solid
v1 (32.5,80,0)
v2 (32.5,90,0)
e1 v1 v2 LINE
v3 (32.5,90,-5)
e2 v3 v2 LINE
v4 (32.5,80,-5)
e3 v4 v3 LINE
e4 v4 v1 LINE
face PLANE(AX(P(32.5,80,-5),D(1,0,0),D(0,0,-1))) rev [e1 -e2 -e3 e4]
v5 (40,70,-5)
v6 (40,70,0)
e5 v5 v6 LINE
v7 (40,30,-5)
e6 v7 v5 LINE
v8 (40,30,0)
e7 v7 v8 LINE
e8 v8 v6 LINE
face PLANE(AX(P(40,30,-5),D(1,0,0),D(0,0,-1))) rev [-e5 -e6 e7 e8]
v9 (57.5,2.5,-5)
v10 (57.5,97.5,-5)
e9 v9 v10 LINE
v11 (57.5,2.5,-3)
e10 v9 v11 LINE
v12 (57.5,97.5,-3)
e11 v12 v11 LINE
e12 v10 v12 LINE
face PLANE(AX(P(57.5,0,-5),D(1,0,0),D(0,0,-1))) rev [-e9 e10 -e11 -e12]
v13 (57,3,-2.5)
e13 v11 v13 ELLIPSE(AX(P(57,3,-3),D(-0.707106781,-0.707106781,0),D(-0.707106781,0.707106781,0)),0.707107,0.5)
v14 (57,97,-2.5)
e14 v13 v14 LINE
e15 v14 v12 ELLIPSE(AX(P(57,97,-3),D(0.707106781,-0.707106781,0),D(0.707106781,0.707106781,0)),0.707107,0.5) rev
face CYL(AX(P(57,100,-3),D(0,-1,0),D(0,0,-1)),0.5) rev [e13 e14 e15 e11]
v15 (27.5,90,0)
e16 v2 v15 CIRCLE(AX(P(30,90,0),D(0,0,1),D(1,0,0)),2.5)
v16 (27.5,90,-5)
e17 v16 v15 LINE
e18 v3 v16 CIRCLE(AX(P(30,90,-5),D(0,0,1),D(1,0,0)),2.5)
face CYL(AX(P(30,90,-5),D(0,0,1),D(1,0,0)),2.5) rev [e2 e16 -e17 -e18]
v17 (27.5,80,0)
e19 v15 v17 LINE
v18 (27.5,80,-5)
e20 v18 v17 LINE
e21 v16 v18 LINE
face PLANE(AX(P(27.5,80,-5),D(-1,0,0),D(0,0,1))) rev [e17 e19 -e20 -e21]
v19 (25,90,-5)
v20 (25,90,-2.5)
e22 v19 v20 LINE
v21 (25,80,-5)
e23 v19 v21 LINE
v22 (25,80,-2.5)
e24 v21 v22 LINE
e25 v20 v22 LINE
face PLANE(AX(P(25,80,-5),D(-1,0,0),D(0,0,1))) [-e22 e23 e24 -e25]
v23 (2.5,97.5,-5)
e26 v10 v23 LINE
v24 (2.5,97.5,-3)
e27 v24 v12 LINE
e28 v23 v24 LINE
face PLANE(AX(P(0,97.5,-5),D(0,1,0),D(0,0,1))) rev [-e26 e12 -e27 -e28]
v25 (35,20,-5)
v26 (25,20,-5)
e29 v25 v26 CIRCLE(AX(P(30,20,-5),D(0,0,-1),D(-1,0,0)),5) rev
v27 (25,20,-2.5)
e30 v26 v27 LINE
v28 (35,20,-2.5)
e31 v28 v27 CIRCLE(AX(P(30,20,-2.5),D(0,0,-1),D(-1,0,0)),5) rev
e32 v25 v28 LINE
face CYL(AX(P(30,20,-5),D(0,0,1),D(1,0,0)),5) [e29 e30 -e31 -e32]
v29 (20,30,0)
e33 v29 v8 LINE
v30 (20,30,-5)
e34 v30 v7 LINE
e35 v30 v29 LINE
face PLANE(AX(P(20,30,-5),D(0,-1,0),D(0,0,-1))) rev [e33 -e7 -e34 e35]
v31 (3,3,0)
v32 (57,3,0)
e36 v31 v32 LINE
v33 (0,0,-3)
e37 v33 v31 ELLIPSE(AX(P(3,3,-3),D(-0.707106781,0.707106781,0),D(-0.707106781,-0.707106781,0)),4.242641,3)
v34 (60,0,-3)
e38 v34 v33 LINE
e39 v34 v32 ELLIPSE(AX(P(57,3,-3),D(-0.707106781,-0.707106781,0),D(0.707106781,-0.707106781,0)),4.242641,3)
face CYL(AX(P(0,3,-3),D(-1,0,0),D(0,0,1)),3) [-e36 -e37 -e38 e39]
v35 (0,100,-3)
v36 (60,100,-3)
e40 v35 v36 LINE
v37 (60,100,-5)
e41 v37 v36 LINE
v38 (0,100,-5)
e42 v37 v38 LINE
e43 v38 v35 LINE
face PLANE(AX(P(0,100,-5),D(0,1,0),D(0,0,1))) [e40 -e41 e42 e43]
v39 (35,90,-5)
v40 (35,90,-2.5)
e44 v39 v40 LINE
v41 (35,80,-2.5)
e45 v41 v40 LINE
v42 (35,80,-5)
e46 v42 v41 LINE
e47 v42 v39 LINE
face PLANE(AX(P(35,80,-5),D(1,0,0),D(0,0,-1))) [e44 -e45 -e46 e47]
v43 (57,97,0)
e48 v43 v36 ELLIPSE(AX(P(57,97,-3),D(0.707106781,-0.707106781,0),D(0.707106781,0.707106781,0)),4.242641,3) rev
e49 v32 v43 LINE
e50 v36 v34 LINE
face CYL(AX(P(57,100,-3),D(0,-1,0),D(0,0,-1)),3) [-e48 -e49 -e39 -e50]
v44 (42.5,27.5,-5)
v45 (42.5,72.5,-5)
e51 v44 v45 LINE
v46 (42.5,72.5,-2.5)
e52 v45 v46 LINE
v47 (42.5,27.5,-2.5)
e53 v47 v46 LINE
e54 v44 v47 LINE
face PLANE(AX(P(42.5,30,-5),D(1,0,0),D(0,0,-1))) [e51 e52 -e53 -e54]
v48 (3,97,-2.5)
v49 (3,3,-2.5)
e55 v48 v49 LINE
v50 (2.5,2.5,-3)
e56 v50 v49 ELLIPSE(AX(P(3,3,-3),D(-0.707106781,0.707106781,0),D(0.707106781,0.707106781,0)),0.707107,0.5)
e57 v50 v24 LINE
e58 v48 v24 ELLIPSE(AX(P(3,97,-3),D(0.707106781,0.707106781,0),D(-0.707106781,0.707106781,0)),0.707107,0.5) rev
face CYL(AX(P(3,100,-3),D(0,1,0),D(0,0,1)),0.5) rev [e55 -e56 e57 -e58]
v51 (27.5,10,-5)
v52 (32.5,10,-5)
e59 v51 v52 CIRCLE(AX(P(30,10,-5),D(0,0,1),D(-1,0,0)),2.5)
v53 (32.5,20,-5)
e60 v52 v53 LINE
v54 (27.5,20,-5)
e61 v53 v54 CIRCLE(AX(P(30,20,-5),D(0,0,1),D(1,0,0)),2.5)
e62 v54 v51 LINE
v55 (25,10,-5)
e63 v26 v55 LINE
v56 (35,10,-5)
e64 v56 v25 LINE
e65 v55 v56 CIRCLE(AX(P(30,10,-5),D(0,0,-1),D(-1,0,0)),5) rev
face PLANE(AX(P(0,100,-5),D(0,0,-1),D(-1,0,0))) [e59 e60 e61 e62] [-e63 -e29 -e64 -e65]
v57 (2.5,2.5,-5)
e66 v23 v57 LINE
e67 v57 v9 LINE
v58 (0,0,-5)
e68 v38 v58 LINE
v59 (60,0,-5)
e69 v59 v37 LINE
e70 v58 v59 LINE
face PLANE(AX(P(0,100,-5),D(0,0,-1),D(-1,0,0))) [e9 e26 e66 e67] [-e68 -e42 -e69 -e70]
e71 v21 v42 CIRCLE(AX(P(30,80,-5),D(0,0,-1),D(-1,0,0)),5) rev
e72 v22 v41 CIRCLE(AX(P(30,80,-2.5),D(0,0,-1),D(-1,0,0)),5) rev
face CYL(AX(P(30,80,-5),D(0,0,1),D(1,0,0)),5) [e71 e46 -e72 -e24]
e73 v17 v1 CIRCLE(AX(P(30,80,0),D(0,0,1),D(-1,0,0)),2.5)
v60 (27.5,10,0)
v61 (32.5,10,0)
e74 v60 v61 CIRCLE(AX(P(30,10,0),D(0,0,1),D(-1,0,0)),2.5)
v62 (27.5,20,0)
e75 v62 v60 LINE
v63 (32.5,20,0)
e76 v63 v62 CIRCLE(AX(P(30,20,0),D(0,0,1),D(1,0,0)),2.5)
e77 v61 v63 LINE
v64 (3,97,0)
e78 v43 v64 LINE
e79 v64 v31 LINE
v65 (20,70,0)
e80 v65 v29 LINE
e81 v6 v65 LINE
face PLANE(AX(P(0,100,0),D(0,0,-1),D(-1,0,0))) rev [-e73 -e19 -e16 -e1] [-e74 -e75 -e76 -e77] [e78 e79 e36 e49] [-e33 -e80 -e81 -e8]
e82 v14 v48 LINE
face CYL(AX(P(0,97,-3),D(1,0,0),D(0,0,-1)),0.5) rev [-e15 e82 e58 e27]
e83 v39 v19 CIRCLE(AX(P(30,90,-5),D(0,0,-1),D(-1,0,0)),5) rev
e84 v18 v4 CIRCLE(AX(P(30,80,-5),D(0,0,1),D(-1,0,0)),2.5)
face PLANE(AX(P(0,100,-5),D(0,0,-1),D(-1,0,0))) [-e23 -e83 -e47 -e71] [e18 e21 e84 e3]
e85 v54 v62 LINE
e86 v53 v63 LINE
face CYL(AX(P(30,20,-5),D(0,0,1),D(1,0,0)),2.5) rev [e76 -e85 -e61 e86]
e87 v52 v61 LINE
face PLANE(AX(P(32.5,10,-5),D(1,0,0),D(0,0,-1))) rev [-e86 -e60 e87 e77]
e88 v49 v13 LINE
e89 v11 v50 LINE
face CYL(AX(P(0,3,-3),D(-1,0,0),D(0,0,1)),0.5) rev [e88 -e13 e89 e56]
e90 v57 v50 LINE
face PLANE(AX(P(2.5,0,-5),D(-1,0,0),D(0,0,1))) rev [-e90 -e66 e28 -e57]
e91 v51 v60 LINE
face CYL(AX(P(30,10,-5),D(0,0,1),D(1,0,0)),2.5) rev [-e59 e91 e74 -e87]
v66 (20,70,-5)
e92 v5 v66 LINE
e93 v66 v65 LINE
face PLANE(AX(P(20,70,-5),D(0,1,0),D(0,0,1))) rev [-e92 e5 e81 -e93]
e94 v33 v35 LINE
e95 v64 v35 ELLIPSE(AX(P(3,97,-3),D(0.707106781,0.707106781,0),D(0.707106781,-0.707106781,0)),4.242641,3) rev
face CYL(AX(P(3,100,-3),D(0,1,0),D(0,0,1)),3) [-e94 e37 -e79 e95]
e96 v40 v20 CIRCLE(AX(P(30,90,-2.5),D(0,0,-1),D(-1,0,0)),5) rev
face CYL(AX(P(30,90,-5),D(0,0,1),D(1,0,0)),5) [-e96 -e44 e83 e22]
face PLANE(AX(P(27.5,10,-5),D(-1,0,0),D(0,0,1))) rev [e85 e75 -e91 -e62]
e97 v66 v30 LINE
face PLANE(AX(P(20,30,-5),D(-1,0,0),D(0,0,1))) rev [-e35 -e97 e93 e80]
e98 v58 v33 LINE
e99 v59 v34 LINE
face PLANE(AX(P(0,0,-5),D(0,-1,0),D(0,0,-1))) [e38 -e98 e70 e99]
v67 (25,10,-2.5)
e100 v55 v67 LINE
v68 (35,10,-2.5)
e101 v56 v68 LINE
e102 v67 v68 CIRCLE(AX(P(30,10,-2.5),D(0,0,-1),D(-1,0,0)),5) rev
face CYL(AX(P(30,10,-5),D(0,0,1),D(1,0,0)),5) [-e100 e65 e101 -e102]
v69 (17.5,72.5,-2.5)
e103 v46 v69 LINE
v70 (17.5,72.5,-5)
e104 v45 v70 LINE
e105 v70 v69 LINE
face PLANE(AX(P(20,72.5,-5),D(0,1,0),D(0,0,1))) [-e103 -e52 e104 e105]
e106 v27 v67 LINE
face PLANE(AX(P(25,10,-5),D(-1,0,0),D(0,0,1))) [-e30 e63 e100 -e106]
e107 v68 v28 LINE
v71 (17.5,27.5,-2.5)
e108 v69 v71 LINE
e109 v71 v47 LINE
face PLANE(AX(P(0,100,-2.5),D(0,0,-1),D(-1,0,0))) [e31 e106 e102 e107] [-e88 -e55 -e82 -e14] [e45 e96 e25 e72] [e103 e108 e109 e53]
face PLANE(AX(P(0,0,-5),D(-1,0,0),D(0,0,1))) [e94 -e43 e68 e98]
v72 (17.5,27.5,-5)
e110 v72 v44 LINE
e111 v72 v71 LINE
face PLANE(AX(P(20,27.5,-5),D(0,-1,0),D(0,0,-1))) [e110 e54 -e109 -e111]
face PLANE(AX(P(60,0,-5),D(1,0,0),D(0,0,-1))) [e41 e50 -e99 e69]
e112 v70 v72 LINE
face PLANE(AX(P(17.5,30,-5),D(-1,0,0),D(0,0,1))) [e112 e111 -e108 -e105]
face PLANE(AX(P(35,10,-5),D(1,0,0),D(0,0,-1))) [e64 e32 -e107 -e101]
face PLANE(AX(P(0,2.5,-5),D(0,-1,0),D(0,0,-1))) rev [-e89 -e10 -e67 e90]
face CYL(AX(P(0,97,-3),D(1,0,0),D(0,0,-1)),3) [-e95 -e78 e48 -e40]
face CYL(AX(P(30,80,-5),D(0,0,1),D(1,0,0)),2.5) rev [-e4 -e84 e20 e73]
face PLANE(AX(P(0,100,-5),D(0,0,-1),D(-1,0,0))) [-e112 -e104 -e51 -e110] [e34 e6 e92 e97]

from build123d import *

# Parameters (mm, degrees)
SKETCH1_W          = 60
SKETCH1_H          = 100
SKETCH1_W_2        = 20
SKETCH1_H_2        = 40
EXTRUDE1_DEPTH     = 5
FILLET2_R          = 3
SHELL2_START       = -5
SHELL2_OUTLINE_W   = 55
SHELL2_OUTLINE_H   = 95
SHELL2_OUTLINE_W_2 = 25
SHELL2_OUTLINE_H_2 = 45
SHELL2_DEPTH       = 2.5
SHELL2_START_2     = 2.5
SHELL2_2_DEPTH     = 95
SHELL2_START_3     = 2
SHELL2_3_DEPTH     = 56


with BuildPart() as part:
    # Sketch1 → Extrude1 (new body)
    with BuildSketch(Plane.XY):
        with Locations((30, 50)):
            Rectangle(SKETCH1_W, SKETCH1_H)
        with Locations((30, 50)):
            Rectangle(SKETCH1_W_2, SKETCH1_H_2, mode=Mode.SUBTRACT)
        with BuildLine():
            Line((32.5, 80), (32.5, 90))
            ThreePointArc((32.5, 90), (30, 92.5), (27.5, 90))
            Line((27.5, 90), (27.5, 80))
            ThreePointArc((27.5, 80), (30, 77.5), (32.5, 80))
        make_face(mode=Mode.SUBTRACT)
        with BuildLine():
            Line((27.5, 10), (27.5, 20))
            ThreePointArc((27.5, 20), (30, 22.5), (32.5, 20))
            Line((32.5, 20), (32.5, 10))
            ThreePointArc((32.5, 10), (30, 7.5), (27.5, 10))
        make_face(mode=Mode.SUBTRACT)
    extrude(amount=-EXTRUDE1_DEPTH)

    # Fillet2
    fillet2_edges = [part.edges().sort_by_distance(p)[0] for p in [
        (30, 100, 0),
        (60, 50, 0),
        (30, 0, 0),
        (0, 50, 0),
    ]]
    fillet(fillet2_edges, radius=FILLET2_R)

    # Shell2: read off the stored shape, not the designer's step
    # Shell2 outline → Shell2 (cut)
    with BuildSketch(Plane.XY.offset(SHELL2_START)):
        with Locations((30, 50)):
            Rectangle(SHELL2_OUTLINE_W, SHELL2_OUTLINE_H)
        with BuildLine():
            Line((25, 10), (25, 20))
            ThreePointArc((25, 20), (30, 25), (35, 20))
            Line((35, 20), (35, 10))
            ThreePointArc((35, 10), (30, 5), (25, 10))
        make_face(mode=Mode.SUBTRACT)
        with Locations((30, 50)):
            Rectangle(SHELL2_OUTLINE_W_2, SHELL2_OUTLINE_H_2, mode=Mode.SUBTRACT)
        with BuildLine():
            ThreePointArc((35, 80), (30, 75), (25, 80))
            Line((25, 80), (25, 90))
            ThreePointArc((25, 90), (30, 95), (35, 90))
            Line((35, 90), (35, 80))
        make_face(mode=Mode.SUBTRACT)
    extrude(amount=SHELL2_DEPTH, mode=Mode.SUBTRACT)

    # Shell2 2 outline → Shell2 2 (add)
    with BuildSketch(Plane(origin=(0, 0, 0), x_dir=(1, 0, 0), z_dir=(0, 1, 0)).offset(SHELL2_START_2)):
        with BuildLine():
            Line((57.5, 2.5), (57.5, 3))
            ThreePointArc((57.5, 3), (57.353553391, 2.646446609), (57, 2.5))
            Line((57, 2.5), (57.5, 2.5))
        make_face()
        with BuildLine():
            Line((2.5, 2.5), (3, 2.5))
            ThreePointArc((3, 2.5), (2.646446609, 2.646446609), (2.5, 3))
            Line((2.5, 3), (2.5, 2.5))
        make_face()
    extrude(amount=SHELL2_2_DEPTH)

    # Shell2 3 outline → Shell2 3 (add)
    with BuildSketch(Plane.YZ.offset(SHELL2_START_3)):
        with BuildLine():
            ThreePointArc((2.5, -3), (2.646446609, -2.646446609), (3, -2.5))
            Line((3, -2.5), (2.5, -2.5))
            Line((2.5, -2.5), (2.5, -3))
        make_face()
        with BuildLine():
            ThreePointArc((97, -2.5), (97.353553391, -2.646446609), (97.5, -3))
            Line((97.5, -3), (97.5, -2.5))
            Line((97.5, -2.5), (97, -2.5))
        make_face()
    extrude(amount=SHELL2_3_DEPTH)


solid = part.part
